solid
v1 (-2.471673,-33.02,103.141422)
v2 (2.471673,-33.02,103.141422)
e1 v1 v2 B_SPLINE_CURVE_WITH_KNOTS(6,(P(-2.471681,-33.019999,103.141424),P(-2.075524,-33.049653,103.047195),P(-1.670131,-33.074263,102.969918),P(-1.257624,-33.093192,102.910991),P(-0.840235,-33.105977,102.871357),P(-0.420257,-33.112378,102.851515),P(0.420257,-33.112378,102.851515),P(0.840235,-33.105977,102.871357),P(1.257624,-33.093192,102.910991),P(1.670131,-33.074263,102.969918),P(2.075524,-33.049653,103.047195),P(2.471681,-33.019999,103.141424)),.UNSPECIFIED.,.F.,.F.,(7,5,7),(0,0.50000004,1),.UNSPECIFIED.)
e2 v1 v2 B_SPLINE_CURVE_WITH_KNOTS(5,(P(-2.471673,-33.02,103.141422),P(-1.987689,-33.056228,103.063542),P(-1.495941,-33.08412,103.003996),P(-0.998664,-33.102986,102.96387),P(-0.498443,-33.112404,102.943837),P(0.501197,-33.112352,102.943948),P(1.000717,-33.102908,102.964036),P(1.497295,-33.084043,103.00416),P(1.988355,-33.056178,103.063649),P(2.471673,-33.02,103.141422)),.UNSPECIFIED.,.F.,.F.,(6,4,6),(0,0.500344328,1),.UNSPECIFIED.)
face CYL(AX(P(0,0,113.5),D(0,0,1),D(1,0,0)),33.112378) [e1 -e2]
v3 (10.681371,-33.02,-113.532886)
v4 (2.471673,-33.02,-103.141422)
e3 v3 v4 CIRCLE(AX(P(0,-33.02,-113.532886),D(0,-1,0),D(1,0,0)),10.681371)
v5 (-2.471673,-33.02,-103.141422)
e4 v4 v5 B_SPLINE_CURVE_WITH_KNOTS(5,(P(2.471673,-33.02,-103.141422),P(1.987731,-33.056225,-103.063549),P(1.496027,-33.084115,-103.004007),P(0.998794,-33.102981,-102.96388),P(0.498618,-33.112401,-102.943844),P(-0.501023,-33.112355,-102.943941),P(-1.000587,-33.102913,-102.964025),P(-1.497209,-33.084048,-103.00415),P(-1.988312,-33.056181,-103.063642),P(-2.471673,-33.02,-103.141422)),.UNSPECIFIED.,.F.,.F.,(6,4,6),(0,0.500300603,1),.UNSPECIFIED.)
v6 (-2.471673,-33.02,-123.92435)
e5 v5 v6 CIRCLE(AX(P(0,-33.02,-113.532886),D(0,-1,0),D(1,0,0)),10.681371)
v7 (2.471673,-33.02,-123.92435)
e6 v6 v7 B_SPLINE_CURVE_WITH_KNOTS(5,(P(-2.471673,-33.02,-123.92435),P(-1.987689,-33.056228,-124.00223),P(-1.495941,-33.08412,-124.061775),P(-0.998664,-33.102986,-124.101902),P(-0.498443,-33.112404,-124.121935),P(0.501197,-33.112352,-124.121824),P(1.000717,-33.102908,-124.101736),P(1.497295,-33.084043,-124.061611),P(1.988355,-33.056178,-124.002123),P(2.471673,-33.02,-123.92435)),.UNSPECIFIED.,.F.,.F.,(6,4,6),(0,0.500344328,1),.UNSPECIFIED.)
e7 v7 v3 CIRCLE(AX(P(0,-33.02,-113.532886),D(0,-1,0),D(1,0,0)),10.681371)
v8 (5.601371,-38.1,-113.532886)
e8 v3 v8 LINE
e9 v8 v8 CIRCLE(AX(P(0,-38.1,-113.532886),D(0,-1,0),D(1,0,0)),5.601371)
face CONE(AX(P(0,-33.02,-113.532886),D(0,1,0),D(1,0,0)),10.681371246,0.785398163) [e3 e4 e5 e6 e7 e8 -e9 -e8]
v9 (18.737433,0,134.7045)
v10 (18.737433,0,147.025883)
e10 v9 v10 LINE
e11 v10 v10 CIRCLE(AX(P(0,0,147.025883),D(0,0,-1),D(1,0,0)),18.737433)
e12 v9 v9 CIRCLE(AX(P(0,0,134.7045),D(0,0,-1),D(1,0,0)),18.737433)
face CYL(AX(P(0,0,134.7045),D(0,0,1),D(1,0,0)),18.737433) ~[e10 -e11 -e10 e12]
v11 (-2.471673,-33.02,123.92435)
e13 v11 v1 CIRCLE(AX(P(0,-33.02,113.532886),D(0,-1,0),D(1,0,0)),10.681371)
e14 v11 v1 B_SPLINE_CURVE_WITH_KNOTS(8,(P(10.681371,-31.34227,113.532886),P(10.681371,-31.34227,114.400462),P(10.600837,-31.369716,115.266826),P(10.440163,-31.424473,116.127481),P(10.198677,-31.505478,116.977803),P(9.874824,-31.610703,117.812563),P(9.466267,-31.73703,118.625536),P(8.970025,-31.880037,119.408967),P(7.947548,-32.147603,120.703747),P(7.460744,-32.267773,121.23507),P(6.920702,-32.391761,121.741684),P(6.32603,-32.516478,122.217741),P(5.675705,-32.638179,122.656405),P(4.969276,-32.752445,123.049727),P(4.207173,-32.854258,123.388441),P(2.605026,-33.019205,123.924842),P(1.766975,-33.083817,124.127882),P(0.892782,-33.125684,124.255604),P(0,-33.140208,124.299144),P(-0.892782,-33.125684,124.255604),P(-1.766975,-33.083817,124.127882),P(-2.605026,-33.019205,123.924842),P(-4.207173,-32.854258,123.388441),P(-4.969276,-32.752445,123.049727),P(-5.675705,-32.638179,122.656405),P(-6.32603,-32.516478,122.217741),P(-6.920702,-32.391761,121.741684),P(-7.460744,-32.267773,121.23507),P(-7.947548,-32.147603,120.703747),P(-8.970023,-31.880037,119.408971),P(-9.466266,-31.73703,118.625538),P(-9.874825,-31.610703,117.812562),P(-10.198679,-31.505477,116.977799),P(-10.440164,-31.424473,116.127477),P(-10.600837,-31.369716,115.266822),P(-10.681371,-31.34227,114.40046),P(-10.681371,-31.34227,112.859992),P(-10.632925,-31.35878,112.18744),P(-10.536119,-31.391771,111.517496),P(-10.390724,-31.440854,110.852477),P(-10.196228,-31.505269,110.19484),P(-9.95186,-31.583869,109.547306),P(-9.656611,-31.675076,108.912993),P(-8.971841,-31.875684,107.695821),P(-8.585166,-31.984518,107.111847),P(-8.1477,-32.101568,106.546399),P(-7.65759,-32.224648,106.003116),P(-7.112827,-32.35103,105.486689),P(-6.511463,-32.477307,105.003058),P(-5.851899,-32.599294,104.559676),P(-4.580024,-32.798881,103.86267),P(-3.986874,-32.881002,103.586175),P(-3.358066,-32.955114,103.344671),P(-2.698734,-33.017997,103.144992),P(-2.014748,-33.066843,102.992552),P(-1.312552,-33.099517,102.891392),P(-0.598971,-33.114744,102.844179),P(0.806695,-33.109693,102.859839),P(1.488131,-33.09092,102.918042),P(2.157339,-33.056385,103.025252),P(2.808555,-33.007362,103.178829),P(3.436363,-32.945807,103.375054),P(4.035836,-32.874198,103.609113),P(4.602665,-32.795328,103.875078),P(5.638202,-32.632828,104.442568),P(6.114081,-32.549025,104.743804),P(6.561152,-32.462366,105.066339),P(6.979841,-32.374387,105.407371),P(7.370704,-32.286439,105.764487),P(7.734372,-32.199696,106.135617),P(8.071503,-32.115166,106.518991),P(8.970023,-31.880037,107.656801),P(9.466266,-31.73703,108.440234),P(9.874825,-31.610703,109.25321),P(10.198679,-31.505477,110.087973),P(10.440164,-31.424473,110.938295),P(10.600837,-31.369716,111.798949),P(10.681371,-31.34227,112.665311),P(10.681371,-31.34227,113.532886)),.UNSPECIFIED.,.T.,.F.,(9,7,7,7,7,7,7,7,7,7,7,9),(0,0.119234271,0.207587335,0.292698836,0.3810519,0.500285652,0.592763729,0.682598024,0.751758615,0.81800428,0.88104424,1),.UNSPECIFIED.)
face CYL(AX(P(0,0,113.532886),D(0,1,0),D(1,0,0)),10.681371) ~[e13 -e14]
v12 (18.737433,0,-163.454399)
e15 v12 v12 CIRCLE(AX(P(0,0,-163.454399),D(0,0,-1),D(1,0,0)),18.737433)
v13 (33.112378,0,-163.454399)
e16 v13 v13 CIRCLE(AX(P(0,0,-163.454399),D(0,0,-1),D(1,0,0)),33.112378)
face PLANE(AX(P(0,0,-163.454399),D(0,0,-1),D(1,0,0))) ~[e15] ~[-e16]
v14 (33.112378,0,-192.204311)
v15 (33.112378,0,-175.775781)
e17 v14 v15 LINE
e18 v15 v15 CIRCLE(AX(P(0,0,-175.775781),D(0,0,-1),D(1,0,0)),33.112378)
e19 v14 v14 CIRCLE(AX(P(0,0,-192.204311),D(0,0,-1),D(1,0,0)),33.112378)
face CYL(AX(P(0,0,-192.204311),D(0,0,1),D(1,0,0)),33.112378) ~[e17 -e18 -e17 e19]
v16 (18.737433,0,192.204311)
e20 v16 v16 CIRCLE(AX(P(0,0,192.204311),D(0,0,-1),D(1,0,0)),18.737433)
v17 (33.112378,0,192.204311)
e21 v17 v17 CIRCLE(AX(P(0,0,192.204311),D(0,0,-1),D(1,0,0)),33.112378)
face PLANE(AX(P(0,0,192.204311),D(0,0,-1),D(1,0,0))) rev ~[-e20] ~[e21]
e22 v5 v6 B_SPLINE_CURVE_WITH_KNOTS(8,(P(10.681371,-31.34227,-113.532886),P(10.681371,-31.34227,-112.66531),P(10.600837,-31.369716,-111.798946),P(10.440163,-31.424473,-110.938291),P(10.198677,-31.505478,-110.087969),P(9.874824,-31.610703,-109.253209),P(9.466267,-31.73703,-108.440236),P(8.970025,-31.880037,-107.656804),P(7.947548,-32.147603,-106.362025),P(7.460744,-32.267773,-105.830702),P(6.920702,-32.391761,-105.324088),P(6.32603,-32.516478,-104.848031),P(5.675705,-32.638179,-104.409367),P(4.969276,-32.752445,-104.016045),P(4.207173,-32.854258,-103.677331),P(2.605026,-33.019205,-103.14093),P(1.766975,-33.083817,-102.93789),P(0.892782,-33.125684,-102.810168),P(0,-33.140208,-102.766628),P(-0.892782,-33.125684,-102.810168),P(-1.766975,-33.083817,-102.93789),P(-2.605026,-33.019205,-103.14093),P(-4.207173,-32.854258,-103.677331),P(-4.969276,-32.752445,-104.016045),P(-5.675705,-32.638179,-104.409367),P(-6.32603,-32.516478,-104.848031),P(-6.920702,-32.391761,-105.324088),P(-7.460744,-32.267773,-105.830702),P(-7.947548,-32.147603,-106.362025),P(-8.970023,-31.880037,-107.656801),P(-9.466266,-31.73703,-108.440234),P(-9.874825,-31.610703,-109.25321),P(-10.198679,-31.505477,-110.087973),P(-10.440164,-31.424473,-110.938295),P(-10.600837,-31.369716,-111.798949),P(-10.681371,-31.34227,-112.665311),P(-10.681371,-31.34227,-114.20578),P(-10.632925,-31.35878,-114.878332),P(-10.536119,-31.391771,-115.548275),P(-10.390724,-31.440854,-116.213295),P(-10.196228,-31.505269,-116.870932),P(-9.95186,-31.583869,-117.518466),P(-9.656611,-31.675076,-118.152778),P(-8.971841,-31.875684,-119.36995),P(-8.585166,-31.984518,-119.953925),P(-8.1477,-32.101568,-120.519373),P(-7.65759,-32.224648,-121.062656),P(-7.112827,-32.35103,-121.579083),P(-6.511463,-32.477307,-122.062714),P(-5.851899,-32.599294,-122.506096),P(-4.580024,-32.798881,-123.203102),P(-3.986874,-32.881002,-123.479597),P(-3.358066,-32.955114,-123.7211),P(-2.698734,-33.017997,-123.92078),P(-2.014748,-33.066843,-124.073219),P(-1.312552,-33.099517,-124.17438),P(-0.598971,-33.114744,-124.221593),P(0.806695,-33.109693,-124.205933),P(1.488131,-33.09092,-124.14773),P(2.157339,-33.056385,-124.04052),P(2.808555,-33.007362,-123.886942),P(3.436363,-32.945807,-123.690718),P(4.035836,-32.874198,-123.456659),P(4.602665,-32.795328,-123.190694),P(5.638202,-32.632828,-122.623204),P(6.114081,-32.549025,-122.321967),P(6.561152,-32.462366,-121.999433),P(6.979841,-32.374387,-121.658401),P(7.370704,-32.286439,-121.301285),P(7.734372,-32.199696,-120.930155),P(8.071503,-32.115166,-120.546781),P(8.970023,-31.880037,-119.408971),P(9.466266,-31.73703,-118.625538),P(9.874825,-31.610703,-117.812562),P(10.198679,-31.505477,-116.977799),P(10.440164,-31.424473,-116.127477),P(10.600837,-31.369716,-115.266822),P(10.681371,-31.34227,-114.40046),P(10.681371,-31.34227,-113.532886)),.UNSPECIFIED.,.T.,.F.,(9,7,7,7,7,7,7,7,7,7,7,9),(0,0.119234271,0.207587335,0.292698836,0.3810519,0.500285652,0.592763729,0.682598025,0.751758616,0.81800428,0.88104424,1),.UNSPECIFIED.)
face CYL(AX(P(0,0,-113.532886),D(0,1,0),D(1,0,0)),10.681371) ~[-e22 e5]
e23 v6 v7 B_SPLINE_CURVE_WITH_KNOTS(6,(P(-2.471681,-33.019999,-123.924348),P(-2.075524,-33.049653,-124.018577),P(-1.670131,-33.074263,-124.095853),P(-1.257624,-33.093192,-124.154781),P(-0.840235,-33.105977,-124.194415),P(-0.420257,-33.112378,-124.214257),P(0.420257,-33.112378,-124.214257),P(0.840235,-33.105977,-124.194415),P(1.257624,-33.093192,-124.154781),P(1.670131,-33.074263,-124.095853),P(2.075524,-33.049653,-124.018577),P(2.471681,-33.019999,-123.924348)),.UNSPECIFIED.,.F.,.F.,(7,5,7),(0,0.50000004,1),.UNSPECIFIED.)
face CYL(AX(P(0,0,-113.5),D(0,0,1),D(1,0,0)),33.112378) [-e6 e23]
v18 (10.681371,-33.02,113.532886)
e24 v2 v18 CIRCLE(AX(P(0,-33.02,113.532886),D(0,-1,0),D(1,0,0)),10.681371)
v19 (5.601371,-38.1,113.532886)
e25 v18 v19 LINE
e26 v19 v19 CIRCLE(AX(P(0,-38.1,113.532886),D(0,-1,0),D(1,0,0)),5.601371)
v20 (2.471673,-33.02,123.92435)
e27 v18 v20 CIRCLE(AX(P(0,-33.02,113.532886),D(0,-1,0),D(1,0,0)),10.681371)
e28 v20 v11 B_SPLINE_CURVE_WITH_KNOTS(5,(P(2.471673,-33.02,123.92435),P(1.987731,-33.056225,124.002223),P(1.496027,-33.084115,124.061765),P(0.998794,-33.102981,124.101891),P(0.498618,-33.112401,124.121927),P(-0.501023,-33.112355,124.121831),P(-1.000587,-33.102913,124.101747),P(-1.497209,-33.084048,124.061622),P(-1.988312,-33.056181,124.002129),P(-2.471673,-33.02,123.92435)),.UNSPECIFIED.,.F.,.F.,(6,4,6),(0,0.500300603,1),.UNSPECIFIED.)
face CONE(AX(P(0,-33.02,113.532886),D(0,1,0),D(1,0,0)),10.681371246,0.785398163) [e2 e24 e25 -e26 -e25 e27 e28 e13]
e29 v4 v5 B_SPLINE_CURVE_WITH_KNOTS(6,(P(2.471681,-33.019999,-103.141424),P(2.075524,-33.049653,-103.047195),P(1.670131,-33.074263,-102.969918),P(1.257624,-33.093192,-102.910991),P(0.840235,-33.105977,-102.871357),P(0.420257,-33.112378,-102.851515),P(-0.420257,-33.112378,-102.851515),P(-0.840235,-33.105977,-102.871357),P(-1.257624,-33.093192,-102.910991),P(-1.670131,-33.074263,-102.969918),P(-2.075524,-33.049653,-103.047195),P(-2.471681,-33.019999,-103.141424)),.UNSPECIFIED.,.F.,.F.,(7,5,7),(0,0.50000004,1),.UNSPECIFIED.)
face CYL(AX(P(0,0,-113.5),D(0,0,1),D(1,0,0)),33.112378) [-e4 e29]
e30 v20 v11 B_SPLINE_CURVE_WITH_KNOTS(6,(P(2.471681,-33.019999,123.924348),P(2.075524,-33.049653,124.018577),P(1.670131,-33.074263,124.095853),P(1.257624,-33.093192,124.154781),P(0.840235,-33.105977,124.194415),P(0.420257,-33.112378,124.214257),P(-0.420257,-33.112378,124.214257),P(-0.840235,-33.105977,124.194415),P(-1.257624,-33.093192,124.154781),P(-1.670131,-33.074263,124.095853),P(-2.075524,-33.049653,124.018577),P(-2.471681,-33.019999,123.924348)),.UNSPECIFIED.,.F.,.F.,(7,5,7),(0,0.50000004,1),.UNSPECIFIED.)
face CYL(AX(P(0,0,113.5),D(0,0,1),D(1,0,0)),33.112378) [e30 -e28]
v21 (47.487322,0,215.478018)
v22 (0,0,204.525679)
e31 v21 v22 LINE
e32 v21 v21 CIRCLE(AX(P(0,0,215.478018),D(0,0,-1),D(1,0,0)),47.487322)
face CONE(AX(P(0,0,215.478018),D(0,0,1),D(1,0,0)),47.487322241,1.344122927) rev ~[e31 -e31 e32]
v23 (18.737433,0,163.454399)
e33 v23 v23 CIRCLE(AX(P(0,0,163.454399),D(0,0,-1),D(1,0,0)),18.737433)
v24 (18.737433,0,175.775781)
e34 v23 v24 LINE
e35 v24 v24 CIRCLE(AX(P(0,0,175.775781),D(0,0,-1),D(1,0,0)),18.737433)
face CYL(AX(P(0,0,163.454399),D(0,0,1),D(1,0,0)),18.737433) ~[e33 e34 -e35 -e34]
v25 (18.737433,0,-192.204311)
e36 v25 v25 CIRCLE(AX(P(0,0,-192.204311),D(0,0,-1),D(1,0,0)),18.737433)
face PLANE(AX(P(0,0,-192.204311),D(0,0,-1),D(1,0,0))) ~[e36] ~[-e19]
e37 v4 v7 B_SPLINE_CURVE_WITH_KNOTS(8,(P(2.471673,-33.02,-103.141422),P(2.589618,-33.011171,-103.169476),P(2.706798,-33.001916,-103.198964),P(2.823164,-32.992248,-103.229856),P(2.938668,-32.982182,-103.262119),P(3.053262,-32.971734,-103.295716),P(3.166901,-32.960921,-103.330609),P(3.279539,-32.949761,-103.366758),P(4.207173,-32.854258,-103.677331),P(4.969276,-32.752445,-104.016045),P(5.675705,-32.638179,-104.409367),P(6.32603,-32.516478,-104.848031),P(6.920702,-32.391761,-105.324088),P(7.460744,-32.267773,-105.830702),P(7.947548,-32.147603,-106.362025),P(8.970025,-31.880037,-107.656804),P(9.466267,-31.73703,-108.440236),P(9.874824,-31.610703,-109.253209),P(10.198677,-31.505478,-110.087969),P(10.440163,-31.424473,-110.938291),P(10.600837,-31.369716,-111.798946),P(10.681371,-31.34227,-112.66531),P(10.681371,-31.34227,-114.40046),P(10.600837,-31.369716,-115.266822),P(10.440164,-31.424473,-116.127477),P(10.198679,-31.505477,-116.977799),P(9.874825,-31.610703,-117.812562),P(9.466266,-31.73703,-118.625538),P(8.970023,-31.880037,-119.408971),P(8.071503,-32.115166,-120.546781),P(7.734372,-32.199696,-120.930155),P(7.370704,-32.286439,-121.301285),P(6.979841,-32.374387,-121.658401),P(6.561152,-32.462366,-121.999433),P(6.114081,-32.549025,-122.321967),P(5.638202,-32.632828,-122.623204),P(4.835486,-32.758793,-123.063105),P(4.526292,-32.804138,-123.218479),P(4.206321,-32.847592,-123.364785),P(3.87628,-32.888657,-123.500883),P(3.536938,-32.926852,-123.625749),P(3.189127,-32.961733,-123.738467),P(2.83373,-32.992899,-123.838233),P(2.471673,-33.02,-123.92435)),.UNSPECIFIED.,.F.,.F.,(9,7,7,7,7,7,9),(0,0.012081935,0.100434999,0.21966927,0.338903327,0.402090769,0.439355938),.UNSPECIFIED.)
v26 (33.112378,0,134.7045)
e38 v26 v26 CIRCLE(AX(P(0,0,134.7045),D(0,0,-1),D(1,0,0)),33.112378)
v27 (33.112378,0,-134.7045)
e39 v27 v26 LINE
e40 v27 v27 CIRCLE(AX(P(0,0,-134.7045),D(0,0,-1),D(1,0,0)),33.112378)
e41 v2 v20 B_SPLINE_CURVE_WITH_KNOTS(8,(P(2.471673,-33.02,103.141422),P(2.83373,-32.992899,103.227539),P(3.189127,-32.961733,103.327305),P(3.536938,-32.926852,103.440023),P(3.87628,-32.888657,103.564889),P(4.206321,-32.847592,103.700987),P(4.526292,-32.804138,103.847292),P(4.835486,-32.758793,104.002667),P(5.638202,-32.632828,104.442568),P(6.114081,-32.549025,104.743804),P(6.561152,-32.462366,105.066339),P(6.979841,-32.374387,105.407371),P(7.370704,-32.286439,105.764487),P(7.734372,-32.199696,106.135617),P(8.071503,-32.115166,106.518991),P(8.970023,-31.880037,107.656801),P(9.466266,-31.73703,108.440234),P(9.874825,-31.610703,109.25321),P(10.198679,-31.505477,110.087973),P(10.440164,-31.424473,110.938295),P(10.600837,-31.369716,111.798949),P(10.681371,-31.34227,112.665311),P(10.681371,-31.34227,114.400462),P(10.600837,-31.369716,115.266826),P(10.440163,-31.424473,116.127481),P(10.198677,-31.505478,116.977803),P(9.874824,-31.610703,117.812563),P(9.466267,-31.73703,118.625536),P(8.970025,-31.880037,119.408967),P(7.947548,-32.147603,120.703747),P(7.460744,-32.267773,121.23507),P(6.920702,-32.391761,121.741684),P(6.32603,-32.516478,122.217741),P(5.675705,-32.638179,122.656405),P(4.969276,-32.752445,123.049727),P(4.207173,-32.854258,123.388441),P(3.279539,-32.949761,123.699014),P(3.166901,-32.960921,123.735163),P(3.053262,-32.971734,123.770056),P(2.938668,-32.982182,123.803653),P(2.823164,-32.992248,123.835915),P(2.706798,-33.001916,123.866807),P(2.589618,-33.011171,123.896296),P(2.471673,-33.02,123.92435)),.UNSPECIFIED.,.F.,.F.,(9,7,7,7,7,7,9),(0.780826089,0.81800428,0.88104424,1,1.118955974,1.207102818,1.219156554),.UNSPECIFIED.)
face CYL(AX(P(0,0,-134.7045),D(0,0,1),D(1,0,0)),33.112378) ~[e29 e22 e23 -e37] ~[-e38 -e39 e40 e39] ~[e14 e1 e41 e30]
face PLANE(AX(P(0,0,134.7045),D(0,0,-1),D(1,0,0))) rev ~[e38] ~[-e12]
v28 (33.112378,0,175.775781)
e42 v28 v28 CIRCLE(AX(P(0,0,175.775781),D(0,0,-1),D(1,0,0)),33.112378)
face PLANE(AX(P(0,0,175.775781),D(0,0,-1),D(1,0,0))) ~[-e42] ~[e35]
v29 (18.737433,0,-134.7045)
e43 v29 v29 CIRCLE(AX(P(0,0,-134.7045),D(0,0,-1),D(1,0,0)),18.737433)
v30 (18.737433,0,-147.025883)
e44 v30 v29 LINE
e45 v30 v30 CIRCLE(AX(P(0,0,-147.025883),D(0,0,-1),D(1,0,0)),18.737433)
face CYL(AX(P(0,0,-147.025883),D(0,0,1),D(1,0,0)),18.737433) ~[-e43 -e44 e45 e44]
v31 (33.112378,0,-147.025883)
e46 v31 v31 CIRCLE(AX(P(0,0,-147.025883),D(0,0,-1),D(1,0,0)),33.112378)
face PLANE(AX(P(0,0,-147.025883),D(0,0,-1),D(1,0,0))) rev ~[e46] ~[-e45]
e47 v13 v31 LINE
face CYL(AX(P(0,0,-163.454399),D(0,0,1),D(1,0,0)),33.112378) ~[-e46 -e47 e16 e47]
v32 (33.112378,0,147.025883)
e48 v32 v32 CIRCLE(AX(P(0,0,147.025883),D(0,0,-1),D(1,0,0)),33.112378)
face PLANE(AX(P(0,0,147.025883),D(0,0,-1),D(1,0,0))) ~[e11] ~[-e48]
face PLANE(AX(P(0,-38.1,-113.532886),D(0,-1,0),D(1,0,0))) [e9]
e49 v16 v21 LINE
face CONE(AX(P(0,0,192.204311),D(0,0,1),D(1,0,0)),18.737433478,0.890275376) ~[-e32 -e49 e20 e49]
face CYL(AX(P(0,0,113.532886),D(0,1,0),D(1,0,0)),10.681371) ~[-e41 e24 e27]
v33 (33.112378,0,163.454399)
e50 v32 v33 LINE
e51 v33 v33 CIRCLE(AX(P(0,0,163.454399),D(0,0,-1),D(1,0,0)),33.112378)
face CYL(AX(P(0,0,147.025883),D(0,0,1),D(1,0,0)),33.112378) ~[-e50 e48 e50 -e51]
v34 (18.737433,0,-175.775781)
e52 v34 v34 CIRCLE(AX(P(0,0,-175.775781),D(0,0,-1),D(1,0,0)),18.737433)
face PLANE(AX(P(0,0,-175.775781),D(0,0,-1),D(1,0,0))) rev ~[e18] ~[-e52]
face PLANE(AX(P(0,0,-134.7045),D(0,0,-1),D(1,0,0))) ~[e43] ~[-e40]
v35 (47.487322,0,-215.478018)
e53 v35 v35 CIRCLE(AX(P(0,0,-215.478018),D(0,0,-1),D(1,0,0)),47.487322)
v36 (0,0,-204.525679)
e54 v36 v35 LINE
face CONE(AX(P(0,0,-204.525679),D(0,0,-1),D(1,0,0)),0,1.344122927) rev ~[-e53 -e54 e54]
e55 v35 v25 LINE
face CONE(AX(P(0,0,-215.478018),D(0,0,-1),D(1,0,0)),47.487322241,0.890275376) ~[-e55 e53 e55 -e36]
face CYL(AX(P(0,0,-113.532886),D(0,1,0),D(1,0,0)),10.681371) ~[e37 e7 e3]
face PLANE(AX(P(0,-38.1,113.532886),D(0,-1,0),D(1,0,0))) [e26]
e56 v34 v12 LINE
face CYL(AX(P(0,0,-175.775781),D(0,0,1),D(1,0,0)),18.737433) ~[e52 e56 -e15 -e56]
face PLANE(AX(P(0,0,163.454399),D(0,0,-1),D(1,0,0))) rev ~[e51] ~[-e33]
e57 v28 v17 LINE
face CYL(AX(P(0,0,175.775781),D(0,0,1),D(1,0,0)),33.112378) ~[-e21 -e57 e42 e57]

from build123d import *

# Parameters (mm, degrees)
F2_R         = 10.6813712462
F3_DEPTH     = 38.1
F4_S5_R      = 33.1123778597
F4_T6_DEPTH  = 17
F4_S11_R     = 33.1123778597
F4_T12_DEPTH = 17


# Not quite as in the source:
# - a fillet or chamfer that OpenCascade refuses, or shapes differently, is made with other operations: its cross-section is extruded or revolved along the edge and cut away or added


with BuildPart() as f1:
    # F0 (on Front) → F1 (revolve)
    with BuildSketch(Plane.XZ):
        Polygon((33.1123778597, 0), (0, 0), (0, -204.5256793499), (47.4873222411, -215.4780179262), (18.7374334782, -192.2043114901), (33.1123778597, -192.2043114901), (33.1123778597, -175.7757812738), (18.7374334782, -175.7757812738), (18.7374334782, -163.4543985128), (33.1123778597, -163.4543985128), (33.1123778597, -147.0258831978), (18.7374334782, -147.0258831978), (18.7374334782, -134.7045004368), (33.1123778597, -134.7045004368), align=None)
        Polygon((0, 204.5256793499), (0, 0), (33.1123778597, 0), (33.1123778597, 134.7045004368), (18.7374334782, 134.7045004368), (18.7374334782, 147.0258831978), (33.1123778597, 147.0258831978), (33.1123778597, 163.4543985128), (18.7374334782, 163.4543985128), (18.7374334782, 175.7757812738), (33.1123778597, 175.7757812738), (33.1123778597, 192.2043114901), (18.7374334782, 192.2043114901), (47.4873222411, 215.4780179262), align=None)
    revolve(axis=Axis((0, 0, -102.2628396749), (0, 0, -1)))

    # F2 (on Front) → F3 (join)
    with BuildSketch(Plane.XZ):
        with Locations((0, 113.5328859091)):
            Circle(F2_R)
        with Locations((0, -113.5328859091)):
            Circle(F2_R)
    extrude(amount=F3_DEPTH)

    # F4: chamfer of 5.08 on 2 edges, made by hand


with BuildPart() as f4_tool2:
    # F4_s3 → F4_t4 (revolve)
    with BuildSketch(Plane.XY.offset(113.5328859091)):
        Polygon((10.6813712462, -33.02), (5.6013712462, -38.1), (10.6813712462, -38.1), align=None)
    revolve(axis=Axis((0, -38.1, 113.5328859091), (0, -1, 0)))

    # F4_s5 → F4_t6 (cut, symmetric)
    with BuildSketch(Plane.XY.offset(113.5)):
        Circle(F4_S5_R)
    extrude(amount=F4_T6_DEPTH, both=True, mode=Mode.SUBTRACT)


with BuildPart() as f1_1:
    add(f1.part)

    # F4_t1: cut F4_tool2
    add(f4_tool2.part, mode=Mode.SUBTRACT)


with BuildPart() as f4_tool8:
    # F4_s9 → F4_t10 (revolve)
    with BuildSketch(Plane.XY.offset(-113.5328859091)):
        Polygon((10.6813712462, -33.02), (5.6013712462, -38.1), (10.6813712462, -38.1), align=None)
    revolve(axis=Axis((0, -38.1, -113.5328859091), (0, -1, 0)))

    # F4_s11 → F4_t12 (cut, symmetric)
    with BuildSketch(Plane.XY.offset(-113.5)):
        Circle(F4_S11_R)
    extrude(amount=F4_T12_DEPTH, both=True, mode=Mode.SUBTRACT)


with BuildPart() as f1_2:
    add(f1_1.part)

    # F4_t7: cut F4_tool8
    add(f4_tool8.part, mode=Mode.SUBTRACT)


solid = f1_2.part
